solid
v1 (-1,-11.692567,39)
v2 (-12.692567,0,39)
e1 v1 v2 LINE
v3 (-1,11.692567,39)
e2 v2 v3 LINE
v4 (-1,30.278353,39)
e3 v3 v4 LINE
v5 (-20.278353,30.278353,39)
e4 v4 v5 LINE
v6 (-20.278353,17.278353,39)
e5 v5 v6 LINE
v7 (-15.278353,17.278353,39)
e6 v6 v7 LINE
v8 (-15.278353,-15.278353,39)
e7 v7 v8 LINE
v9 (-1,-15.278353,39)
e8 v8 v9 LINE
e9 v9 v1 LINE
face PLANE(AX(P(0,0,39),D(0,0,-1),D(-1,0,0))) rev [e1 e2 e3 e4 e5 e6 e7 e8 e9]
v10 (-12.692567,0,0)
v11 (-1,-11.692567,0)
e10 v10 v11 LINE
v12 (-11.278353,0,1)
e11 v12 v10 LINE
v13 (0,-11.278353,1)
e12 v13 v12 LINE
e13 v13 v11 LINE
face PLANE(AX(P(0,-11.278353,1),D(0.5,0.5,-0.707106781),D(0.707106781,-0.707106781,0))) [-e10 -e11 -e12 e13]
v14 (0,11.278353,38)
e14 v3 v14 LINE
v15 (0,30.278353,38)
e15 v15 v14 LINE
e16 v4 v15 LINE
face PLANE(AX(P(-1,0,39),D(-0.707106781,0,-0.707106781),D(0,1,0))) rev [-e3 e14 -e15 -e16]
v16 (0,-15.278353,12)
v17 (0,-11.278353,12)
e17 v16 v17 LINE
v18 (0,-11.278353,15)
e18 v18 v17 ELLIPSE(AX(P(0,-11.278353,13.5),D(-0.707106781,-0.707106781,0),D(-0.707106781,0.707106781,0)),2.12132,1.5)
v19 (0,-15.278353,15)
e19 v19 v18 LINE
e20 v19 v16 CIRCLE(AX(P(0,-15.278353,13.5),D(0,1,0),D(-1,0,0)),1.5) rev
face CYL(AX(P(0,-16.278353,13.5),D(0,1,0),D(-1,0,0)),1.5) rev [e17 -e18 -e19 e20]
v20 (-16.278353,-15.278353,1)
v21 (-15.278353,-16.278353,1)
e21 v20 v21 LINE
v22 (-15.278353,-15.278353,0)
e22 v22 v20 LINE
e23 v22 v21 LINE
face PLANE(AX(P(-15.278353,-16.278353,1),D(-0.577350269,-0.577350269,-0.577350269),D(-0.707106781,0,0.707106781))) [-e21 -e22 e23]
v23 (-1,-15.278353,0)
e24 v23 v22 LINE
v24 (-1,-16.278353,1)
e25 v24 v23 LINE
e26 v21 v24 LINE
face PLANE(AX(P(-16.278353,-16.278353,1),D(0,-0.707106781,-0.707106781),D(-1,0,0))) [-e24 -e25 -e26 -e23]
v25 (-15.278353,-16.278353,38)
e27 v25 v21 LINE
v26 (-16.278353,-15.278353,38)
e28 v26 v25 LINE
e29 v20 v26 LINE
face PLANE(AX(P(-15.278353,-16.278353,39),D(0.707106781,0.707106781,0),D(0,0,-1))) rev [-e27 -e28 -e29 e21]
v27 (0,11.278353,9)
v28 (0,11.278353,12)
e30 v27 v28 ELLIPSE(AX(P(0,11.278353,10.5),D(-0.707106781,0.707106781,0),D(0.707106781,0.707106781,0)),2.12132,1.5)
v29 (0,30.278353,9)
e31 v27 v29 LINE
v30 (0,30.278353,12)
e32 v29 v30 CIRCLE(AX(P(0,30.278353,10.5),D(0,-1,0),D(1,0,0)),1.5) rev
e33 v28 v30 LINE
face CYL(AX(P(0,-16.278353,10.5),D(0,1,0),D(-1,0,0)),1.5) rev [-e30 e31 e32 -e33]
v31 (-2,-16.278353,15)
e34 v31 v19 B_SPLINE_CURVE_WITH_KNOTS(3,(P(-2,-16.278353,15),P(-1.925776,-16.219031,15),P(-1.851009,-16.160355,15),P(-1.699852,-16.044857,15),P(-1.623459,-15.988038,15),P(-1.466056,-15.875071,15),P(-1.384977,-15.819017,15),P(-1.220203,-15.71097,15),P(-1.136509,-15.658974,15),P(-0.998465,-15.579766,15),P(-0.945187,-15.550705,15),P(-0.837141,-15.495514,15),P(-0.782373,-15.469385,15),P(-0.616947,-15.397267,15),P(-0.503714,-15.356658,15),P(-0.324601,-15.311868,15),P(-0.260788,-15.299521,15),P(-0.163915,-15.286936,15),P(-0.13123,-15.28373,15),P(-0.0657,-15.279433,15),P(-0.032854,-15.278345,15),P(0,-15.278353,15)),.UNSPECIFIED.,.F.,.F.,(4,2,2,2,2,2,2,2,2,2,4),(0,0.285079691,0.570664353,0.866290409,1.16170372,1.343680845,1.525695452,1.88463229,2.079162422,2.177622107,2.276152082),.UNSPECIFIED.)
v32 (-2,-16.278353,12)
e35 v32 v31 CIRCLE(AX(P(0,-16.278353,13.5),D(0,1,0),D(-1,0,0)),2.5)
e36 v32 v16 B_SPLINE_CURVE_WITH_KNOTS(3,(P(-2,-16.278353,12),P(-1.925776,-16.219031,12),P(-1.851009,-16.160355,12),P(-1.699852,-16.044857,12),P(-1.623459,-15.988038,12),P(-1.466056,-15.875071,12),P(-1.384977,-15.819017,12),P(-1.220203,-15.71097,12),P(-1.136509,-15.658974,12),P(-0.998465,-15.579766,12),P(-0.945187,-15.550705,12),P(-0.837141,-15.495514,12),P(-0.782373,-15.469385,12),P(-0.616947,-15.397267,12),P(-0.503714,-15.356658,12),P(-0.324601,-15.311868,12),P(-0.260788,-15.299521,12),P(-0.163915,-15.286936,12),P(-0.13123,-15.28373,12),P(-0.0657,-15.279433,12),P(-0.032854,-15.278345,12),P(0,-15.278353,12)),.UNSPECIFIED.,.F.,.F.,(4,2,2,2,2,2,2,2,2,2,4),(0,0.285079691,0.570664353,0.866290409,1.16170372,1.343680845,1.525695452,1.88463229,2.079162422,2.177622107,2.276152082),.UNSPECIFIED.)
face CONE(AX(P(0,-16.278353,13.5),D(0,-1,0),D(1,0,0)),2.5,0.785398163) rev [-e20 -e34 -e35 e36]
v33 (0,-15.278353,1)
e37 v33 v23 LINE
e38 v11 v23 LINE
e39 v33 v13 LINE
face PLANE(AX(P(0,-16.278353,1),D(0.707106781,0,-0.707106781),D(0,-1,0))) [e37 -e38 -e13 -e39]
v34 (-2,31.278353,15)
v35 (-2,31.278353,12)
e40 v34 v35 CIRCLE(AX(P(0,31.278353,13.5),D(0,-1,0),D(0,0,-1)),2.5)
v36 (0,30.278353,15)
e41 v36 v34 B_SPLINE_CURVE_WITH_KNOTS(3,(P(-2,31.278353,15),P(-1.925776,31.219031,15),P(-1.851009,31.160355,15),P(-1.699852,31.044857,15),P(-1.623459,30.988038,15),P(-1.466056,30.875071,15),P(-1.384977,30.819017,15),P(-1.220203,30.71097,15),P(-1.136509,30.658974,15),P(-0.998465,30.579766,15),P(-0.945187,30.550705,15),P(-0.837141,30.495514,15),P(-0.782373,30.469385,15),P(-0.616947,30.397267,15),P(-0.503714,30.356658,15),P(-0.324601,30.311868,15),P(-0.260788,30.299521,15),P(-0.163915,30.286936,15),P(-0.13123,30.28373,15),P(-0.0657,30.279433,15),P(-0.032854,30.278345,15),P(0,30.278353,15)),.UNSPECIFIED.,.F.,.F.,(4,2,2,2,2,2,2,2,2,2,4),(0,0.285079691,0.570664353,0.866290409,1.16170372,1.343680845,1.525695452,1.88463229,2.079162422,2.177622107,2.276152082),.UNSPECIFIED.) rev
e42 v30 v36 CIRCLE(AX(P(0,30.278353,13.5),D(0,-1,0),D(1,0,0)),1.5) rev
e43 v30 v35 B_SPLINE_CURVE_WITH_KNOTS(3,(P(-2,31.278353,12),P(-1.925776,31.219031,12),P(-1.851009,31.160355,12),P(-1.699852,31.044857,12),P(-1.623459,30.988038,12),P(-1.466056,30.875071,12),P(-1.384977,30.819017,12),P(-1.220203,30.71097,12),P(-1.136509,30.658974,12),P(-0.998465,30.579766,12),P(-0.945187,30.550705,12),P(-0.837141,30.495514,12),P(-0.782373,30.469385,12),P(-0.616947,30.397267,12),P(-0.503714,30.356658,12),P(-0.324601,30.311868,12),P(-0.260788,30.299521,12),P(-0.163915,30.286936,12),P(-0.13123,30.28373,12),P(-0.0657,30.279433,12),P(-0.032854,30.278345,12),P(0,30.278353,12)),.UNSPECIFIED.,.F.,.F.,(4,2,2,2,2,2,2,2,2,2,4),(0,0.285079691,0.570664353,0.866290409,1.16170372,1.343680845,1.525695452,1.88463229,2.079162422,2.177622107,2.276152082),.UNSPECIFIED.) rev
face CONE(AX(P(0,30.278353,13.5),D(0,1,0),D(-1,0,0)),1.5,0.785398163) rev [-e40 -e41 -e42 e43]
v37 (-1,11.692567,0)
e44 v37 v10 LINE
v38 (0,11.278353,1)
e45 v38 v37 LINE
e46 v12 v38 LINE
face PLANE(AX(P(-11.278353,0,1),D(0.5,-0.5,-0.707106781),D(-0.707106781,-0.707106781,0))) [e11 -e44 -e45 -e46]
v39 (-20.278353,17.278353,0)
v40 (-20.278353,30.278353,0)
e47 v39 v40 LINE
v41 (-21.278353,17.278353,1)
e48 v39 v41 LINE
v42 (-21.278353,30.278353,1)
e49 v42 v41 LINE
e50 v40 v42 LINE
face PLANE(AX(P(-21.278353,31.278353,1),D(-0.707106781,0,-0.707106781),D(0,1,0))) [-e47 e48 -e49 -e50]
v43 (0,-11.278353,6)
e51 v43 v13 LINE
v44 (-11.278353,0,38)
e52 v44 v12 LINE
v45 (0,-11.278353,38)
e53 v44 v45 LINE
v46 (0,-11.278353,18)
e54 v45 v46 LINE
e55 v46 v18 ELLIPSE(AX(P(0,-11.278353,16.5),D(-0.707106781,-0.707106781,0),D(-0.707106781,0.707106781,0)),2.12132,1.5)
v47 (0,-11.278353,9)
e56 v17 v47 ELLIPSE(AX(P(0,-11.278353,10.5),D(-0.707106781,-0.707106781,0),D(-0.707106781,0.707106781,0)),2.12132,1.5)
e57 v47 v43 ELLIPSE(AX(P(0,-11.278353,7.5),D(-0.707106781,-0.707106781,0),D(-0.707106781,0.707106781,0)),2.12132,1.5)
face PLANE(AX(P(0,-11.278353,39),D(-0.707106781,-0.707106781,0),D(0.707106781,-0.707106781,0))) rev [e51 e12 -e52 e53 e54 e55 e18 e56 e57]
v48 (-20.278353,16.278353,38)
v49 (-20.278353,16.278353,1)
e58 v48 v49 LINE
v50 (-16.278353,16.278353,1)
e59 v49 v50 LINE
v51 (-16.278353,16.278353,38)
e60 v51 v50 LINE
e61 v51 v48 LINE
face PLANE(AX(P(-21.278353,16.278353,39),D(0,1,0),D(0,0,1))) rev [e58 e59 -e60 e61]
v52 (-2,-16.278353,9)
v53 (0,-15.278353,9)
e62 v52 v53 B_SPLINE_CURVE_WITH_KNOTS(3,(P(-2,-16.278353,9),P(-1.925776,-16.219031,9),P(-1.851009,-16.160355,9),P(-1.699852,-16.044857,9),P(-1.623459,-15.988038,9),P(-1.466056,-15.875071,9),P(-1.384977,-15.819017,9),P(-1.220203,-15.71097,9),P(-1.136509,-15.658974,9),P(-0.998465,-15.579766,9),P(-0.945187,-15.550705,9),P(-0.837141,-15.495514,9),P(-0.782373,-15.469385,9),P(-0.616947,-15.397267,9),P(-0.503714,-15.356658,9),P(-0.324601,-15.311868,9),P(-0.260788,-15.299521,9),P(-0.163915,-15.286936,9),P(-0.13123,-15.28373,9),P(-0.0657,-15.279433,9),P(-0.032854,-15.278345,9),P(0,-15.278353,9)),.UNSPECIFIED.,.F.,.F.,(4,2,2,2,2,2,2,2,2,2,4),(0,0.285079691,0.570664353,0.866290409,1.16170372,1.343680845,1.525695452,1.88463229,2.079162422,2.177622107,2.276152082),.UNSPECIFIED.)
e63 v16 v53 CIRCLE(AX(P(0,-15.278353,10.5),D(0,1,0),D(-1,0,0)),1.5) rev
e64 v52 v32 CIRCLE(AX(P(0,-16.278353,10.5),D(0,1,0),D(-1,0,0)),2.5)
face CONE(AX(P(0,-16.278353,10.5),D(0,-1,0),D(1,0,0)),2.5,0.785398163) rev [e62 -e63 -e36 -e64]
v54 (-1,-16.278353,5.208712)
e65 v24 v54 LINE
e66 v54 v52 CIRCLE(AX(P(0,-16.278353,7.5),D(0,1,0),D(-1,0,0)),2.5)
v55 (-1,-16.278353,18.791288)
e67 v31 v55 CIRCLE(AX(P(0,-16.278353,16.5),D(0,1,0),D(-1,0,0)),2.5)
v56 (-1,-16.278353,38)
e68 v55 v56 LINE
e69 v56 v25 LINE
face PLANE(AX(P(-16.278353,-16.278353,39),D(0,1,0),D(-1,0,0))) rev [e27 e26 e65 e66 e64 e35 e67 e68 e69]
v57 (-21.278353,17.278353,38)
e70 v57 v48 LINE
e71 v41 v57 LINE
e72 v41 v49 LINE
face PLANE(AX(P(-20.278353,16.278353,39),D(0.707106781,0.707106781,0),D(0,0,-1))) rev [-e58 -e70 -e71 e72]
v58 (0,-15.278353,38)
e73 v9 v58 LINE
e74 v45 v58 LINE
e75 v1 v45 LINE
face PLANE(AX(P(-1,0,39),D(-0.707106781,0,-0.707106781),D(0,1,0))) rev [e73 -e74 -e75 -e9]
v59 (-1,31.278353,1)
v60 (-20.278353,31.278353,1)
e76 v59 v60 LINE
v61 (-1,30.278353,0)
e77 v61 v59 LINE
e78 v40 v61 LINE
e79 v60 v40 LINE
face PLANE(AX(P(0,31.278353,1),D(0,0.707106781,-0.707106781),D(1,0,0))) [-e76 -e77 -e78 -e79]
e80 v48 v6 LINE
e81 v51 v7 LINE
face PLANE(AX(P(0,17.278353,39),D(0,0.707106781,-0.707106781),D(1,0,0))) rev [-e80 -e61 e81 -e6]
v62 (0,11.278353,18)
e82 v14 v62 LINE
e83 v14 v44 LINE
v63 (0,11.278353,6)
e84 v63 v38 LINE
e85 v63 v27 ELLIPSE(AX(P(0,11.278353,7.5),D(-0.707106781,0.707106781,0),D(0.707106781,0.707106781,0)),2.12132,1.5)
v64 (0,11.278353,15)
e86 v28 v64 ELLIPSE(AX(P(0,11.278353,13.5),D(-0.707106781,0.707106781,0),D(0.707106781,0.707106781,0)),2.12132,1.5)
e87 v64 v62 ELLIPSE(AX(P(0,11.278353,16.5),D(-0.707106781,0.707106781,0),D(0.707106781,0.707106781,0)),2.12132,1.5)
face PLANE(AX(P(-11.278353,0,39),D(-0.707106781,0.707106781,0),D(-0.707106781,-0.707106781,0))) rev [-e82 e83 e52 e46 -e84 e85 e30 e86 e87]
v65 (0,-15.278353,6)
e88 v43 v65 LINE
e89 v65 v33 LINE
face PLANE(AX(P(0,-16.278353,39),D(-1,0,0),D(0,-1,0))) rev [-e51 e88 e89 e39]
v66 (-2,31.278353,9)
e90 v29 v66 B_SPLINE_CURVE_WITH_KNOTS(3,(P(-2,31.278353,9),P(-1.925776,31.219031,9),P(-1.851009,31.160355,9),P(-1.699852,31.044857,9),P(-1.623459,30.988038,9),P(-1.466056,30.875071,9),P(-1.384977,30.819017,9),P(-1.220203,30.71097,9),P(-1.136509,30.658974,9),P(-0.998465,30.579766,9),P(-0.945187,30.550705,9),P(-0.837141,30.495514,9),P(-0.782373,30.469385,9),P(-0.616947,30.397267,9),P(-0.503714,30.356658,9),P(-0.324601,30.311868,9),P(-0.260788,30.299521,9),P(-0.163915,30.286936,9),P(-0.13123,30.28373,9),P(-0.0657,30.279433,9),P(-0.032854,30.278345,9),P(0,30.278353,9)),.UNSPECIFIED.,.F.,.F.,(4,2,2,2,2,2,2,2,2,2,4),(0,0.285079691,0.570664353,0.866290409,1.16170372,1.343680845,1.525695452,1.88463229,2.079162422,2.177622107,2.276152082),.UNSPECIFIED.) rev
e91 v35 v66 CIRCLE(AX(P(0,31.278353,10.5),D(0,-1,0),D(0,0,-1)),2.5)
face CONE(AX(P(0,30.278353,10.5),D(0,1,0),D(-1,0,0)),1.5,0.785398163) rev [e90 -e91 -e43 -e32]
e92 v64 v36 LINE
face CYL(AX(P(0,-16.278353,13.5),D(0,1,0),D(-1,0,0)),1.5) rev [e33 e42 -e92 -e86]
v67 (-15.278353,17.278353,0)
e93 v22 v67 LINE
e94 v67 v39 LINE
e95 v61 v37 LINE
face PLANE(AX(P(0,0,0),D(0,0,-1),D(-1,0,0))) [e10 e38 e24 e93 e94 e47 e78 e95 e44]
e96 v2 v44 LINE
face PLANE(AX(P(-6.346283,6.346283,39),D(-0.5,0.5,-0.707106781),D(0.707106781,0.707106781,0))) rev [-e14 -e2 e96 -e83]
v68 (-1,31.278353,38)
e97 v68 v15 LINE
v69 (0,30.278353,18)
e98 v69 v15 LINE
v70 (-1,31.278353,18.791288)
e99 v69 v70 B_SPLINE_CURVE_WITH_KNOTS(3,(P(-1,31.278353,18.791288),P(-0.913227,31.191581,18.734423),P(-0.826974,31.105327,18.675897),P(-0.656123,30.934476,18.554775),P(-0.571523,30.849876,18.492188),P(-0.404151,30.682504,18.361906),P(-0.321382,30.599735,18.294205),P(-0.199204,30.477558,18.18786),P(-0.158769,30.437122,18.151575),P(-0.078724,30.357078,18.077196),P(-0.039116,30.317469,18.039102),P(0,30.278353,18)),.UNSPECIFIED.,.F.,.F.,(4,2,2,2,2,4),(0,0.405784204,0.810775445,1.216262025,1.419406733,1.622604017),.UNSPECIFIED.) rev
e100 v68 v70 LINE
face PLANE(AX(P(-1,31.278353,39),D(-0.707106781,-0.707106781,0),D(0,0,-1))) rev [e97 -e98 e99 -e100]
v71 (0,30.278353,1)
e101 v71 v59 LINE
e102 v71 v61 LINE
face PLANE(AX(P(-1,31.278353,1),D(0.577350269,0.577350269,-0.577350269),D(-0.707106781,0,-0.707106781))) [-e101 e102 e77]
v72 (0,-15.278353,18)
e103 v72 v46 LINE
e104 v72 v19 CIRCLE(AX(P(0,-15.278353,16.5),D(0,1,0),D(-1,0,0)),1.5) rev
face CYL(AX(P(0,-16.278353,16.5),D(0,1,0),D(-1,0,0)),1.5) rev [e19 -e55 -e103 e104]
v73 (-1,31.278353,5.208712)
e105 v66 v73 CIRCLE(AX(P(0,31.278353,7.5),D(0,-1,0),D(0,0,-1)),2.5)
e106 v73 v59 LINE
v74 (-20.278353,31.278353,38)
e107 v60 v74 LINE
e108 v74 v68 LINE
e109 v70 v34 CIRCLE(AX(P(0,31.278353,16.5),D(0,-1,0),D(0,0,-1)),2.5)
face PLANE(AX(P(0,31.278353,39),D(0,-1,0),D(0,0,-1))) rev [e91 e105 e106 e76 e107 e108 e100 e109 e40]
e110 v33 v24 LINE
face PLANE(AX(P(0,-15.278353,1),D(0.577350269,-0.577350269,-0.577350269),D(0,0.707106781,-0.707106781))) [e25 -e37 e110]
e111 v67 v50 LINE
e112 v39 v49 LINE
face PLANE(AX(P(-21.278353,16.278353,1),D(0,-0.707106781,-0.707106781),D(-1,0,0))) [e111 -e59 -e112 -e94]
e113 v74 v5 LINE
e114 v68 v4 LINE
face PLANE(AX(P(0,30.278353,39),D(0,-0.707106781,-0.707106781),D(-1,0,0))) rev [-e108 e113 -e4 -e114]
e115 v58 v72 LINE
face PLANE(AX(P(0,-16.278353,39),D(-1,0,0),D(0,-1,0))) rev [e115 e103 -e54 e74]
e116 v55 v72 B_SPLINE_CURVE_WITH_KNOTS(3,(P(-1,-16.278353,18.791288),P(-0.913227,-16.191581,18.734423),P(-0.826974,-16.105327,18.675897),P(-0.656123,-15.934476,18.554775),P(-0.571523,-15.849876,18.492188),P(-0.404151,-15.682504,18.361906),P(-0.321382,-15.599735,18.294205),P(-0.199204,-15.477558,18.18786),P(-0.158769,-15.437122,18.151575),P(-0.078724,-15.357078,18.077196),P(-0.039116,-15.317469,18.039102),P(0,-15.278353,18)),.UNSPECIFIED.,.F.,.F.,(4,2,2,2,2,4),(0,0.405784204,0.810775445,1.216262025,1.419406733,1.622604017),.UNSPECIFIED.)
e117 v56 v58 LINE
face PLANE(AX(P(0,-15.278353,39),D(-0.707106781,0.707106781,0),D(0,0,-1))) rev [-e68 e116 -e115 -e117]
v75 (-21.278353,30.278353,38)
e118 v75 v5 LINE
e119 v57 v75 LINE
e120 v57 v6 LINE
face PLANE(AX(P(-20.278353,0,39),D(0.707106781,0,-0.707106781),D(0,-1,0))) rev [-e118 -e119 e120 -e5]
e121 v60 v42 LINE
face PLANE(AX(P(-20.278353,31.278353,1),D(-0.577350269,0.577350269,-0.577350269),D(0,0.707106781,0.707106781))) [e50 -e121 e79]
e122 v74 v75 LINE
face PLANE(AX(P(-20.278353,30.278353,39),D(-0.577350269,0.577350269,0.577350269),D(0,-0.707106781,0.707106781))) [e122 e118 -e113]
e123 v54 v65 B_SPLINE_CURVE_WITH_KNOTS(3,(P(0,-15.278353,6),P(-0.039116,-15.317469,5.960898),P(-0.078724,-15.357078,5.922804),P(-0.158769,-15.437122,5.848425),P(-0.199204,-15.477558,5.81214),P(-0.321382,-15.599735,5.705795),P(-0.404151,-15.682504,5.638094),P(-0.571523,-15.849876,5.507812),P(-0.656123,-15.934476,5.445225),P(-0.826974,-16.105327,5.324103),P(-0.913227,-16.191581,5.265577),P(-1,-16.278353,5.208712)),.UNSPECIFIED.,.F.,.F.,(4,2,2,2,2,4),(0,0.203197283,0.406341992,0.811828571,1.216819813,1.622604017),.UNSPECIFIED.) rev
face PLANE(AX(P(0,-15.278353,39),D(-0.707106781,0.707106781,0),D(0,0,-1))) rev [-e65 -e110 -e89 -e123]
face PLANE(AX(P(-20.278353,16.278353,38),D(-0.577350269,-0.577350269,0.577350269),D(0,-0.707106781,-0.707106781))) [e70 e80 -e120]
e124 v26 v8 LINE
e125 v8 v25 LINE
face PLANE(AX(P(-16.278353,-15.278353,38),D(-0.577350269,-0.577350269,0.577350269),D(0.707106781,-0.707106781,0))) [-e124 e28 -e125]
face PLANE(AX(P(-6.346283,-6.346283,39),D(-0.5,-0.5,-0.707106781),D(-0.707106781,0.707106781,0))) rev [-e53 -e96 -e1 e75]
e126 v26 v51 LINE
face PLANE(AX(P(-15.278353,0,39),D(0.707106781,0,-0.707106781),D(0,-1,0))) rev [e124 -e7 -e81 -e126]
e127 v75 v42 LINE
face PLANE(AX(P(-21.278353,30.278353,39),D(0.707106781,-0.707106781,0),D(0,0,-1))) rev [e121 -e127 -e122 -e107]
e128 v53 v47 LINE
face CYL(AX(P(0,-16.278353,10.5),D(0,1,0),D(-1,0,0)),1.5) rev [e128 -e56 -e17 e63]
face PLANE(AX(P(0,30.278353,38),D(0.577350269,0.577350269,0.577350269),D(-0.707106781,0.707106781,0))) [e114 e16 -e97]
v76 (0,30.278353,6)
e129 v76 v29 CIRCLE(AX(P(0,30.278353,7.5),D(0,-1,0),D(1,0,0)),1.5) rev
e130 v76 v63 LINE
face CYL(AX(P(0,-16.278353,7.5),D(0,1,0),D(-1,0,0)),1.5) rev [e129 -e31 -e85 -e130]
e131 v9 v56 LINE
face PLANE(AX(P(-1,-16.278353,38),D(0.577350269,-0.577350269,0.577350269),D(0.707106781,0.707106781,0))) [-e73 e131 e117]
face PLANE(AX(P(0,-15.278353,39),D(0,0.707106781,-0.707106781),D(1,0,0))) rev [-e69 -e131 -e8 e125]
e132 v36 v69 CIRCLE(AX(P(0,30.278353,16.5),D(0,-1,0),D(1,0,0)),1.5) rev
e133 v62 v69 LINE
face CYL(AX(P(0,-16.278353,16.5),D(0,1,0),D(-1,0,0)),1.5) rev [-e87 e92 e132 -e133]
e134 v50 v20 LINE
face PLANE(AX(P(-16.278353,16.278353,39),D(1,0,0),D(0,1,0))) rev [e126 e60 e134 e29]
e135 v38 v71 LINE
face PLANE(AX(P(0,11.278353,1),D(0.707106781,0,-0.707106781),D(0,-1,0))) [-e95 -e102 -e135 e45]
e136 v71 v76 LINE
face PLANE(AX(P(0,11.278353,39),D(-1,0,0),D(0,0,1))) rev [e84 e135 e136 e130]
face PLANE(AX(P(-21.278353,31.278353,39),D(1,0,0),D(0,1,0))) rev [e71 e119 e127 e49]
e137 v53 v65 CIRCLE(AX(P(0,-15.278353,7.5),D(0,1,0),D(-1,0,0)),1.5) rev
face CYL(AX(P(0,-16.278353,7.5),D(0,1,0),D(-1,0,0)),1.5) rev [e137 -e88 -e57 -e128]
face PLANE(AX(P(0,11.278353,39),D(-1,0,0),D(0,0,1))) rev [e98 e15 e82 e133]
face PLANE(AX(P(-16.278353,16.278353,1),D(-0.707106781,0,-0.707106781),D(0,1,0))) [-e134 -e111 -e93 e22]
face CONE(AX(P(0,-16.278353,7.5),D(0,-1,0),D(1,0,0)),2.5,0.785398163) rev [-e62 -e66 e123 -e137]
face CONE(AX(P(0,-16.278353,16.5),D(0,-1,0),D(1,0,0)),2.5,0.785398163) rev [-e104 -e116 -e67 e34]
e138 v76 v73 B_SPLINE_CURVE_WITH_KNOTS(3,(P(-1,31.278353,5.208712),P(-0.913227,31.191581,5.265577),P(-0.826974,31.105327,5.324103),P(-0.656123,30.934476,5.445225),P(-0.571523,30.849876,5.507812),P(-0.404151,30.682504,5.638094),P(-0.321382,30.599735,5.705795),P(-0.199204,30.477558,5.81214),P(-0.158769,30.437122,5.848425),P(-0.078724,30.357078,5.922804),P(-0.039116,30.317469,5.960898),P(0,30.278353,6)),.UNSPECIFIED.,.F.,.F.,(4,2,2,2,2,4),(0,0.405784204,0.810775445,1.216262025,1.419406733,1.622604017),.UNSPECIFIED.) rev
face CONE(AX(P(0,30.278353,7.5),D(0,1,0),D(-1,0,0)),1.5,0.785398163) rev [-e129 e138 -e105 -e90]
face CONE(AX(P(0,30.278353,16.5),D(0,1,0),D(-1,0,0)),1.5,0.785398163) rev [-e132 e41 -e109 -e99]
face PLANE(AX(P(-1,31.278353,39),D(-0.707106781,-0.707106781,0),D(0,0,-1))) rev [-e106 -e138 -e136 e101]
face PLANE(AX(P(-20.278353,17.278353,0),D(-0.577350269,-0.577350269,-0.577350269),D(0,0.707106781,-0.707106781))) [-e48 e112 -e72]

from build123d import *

# Parameters (mm, degrees)
BOSS_EXTRUDE1_DEPTH = 39
SKETCH2_R           = 1.5
CUT_EXTRUDE1_DEPTH  = 66.080017127
LPATTERN2_COUNT     = 10
LPATTERN2_PITCH     = 3
CHAMFER2_SIZE       = 1


with BuildPart() as part:
    # Sketch1 → Boss-Extrude1 (new body)
    with BuildSketch(Plane.XY):
        Polygon((-11.27835316, 0), (0, 11.27835316), (0, 31.27835316), (-21.27835316, 31.27835316), (-21.27835316, 16.27835316), (-16.27835316, 16.27835316), (-16.27835316, -16.27835316), (0, -16.27835316), (0, -11.27835316), align=None)
    extrude(amount=BOSS_EXTRUDE1_DEPTH)

    # Sketch2 → Cut-Extrude1 (cut, through all)
    with BuildSketch(Plane(origin=(0, 31.27835316, 0), x_dir=(1, 0, 0), z_dir=(0, 1, 0))):
        with Locations((0, -7.5)):
            Circle(SKETCH2_R)
    cut_extrude1 = extrude(amount=-CUT_EXTRUDE1_DEPTH, mode=Mode.SUBTRACT)

    # LPattern2: Cut-Extrude1 ×10, 6 skipped
    with Locations(*[(0, 0, i * LPATTERN2_PITCH) for i in range(1, LPATTERN2_COUNT) if i not in (4, 5, 6, 7, 8, 9)]):
        add(cut_extrude1, mode=Mode.SUBTRACT)

    # Chamfer2
    chamfer2_edges = [part.edges().sort_by_distance(p)[0] for p in [
        (-1.5, 31.27835316, 16.5),
        (-1.5, 31.27835316, 13.5),
        (-1.5, 31.27835316, 10.5),
        (-1.5, 31.27835316, 7.5),
        (0, 31.27835316, 3),
        (-1.5, -16.27835316, 16.5),
        (-1.5, -16.27835316, 13.5),
        (-1.5, -16.27835316, 10.5),
        (-1.5, -16.27835316, 7.5),
        (0, -16.27835316, 3),
        (0, -13.77835316, 39),
        (-8.13917658, -16.27835316, 39),
        (-18.77835316, 16.27835316, 39),
        (-5.63917658, -5.63917658, 39),
        (-5.63917658, 5.63917658, 39),
        (0, 21.27835316, 39),
        (-10.63917658, 31.27835316, 39),
        (-5.63917658, 5.63917658, 0),
        (0, 21.27835316, 0),
        (-10.63917658, 31.27835316, 0),
        (-21.27835316, 31.27835316, 19.5),
        (-21.27835316, 23.77835316, 39),
        (-21.27835316, 16.27835316, 19.5),
        (-21.27835316, 23.77835316, 0),
        (-18.77835316, 16.27835316, 0),
        (-5.63917658, -5.63917658, 0),
        (0, -13.77835316, 0),
        (-8.13917658, -16.27835316, 0),
        (-16.27835316, 0, 39),
        (-16.27835316, -16.27835316, 19.5),
        (-16.27835316, 0, 0),
        (0, 31.27835316, 28.5),
        (0, -16.27835316, 28.5),
    ]]
    chamfer(chamfer2_edges, length=CHAMFER2_SIZE)


solid = part.part
